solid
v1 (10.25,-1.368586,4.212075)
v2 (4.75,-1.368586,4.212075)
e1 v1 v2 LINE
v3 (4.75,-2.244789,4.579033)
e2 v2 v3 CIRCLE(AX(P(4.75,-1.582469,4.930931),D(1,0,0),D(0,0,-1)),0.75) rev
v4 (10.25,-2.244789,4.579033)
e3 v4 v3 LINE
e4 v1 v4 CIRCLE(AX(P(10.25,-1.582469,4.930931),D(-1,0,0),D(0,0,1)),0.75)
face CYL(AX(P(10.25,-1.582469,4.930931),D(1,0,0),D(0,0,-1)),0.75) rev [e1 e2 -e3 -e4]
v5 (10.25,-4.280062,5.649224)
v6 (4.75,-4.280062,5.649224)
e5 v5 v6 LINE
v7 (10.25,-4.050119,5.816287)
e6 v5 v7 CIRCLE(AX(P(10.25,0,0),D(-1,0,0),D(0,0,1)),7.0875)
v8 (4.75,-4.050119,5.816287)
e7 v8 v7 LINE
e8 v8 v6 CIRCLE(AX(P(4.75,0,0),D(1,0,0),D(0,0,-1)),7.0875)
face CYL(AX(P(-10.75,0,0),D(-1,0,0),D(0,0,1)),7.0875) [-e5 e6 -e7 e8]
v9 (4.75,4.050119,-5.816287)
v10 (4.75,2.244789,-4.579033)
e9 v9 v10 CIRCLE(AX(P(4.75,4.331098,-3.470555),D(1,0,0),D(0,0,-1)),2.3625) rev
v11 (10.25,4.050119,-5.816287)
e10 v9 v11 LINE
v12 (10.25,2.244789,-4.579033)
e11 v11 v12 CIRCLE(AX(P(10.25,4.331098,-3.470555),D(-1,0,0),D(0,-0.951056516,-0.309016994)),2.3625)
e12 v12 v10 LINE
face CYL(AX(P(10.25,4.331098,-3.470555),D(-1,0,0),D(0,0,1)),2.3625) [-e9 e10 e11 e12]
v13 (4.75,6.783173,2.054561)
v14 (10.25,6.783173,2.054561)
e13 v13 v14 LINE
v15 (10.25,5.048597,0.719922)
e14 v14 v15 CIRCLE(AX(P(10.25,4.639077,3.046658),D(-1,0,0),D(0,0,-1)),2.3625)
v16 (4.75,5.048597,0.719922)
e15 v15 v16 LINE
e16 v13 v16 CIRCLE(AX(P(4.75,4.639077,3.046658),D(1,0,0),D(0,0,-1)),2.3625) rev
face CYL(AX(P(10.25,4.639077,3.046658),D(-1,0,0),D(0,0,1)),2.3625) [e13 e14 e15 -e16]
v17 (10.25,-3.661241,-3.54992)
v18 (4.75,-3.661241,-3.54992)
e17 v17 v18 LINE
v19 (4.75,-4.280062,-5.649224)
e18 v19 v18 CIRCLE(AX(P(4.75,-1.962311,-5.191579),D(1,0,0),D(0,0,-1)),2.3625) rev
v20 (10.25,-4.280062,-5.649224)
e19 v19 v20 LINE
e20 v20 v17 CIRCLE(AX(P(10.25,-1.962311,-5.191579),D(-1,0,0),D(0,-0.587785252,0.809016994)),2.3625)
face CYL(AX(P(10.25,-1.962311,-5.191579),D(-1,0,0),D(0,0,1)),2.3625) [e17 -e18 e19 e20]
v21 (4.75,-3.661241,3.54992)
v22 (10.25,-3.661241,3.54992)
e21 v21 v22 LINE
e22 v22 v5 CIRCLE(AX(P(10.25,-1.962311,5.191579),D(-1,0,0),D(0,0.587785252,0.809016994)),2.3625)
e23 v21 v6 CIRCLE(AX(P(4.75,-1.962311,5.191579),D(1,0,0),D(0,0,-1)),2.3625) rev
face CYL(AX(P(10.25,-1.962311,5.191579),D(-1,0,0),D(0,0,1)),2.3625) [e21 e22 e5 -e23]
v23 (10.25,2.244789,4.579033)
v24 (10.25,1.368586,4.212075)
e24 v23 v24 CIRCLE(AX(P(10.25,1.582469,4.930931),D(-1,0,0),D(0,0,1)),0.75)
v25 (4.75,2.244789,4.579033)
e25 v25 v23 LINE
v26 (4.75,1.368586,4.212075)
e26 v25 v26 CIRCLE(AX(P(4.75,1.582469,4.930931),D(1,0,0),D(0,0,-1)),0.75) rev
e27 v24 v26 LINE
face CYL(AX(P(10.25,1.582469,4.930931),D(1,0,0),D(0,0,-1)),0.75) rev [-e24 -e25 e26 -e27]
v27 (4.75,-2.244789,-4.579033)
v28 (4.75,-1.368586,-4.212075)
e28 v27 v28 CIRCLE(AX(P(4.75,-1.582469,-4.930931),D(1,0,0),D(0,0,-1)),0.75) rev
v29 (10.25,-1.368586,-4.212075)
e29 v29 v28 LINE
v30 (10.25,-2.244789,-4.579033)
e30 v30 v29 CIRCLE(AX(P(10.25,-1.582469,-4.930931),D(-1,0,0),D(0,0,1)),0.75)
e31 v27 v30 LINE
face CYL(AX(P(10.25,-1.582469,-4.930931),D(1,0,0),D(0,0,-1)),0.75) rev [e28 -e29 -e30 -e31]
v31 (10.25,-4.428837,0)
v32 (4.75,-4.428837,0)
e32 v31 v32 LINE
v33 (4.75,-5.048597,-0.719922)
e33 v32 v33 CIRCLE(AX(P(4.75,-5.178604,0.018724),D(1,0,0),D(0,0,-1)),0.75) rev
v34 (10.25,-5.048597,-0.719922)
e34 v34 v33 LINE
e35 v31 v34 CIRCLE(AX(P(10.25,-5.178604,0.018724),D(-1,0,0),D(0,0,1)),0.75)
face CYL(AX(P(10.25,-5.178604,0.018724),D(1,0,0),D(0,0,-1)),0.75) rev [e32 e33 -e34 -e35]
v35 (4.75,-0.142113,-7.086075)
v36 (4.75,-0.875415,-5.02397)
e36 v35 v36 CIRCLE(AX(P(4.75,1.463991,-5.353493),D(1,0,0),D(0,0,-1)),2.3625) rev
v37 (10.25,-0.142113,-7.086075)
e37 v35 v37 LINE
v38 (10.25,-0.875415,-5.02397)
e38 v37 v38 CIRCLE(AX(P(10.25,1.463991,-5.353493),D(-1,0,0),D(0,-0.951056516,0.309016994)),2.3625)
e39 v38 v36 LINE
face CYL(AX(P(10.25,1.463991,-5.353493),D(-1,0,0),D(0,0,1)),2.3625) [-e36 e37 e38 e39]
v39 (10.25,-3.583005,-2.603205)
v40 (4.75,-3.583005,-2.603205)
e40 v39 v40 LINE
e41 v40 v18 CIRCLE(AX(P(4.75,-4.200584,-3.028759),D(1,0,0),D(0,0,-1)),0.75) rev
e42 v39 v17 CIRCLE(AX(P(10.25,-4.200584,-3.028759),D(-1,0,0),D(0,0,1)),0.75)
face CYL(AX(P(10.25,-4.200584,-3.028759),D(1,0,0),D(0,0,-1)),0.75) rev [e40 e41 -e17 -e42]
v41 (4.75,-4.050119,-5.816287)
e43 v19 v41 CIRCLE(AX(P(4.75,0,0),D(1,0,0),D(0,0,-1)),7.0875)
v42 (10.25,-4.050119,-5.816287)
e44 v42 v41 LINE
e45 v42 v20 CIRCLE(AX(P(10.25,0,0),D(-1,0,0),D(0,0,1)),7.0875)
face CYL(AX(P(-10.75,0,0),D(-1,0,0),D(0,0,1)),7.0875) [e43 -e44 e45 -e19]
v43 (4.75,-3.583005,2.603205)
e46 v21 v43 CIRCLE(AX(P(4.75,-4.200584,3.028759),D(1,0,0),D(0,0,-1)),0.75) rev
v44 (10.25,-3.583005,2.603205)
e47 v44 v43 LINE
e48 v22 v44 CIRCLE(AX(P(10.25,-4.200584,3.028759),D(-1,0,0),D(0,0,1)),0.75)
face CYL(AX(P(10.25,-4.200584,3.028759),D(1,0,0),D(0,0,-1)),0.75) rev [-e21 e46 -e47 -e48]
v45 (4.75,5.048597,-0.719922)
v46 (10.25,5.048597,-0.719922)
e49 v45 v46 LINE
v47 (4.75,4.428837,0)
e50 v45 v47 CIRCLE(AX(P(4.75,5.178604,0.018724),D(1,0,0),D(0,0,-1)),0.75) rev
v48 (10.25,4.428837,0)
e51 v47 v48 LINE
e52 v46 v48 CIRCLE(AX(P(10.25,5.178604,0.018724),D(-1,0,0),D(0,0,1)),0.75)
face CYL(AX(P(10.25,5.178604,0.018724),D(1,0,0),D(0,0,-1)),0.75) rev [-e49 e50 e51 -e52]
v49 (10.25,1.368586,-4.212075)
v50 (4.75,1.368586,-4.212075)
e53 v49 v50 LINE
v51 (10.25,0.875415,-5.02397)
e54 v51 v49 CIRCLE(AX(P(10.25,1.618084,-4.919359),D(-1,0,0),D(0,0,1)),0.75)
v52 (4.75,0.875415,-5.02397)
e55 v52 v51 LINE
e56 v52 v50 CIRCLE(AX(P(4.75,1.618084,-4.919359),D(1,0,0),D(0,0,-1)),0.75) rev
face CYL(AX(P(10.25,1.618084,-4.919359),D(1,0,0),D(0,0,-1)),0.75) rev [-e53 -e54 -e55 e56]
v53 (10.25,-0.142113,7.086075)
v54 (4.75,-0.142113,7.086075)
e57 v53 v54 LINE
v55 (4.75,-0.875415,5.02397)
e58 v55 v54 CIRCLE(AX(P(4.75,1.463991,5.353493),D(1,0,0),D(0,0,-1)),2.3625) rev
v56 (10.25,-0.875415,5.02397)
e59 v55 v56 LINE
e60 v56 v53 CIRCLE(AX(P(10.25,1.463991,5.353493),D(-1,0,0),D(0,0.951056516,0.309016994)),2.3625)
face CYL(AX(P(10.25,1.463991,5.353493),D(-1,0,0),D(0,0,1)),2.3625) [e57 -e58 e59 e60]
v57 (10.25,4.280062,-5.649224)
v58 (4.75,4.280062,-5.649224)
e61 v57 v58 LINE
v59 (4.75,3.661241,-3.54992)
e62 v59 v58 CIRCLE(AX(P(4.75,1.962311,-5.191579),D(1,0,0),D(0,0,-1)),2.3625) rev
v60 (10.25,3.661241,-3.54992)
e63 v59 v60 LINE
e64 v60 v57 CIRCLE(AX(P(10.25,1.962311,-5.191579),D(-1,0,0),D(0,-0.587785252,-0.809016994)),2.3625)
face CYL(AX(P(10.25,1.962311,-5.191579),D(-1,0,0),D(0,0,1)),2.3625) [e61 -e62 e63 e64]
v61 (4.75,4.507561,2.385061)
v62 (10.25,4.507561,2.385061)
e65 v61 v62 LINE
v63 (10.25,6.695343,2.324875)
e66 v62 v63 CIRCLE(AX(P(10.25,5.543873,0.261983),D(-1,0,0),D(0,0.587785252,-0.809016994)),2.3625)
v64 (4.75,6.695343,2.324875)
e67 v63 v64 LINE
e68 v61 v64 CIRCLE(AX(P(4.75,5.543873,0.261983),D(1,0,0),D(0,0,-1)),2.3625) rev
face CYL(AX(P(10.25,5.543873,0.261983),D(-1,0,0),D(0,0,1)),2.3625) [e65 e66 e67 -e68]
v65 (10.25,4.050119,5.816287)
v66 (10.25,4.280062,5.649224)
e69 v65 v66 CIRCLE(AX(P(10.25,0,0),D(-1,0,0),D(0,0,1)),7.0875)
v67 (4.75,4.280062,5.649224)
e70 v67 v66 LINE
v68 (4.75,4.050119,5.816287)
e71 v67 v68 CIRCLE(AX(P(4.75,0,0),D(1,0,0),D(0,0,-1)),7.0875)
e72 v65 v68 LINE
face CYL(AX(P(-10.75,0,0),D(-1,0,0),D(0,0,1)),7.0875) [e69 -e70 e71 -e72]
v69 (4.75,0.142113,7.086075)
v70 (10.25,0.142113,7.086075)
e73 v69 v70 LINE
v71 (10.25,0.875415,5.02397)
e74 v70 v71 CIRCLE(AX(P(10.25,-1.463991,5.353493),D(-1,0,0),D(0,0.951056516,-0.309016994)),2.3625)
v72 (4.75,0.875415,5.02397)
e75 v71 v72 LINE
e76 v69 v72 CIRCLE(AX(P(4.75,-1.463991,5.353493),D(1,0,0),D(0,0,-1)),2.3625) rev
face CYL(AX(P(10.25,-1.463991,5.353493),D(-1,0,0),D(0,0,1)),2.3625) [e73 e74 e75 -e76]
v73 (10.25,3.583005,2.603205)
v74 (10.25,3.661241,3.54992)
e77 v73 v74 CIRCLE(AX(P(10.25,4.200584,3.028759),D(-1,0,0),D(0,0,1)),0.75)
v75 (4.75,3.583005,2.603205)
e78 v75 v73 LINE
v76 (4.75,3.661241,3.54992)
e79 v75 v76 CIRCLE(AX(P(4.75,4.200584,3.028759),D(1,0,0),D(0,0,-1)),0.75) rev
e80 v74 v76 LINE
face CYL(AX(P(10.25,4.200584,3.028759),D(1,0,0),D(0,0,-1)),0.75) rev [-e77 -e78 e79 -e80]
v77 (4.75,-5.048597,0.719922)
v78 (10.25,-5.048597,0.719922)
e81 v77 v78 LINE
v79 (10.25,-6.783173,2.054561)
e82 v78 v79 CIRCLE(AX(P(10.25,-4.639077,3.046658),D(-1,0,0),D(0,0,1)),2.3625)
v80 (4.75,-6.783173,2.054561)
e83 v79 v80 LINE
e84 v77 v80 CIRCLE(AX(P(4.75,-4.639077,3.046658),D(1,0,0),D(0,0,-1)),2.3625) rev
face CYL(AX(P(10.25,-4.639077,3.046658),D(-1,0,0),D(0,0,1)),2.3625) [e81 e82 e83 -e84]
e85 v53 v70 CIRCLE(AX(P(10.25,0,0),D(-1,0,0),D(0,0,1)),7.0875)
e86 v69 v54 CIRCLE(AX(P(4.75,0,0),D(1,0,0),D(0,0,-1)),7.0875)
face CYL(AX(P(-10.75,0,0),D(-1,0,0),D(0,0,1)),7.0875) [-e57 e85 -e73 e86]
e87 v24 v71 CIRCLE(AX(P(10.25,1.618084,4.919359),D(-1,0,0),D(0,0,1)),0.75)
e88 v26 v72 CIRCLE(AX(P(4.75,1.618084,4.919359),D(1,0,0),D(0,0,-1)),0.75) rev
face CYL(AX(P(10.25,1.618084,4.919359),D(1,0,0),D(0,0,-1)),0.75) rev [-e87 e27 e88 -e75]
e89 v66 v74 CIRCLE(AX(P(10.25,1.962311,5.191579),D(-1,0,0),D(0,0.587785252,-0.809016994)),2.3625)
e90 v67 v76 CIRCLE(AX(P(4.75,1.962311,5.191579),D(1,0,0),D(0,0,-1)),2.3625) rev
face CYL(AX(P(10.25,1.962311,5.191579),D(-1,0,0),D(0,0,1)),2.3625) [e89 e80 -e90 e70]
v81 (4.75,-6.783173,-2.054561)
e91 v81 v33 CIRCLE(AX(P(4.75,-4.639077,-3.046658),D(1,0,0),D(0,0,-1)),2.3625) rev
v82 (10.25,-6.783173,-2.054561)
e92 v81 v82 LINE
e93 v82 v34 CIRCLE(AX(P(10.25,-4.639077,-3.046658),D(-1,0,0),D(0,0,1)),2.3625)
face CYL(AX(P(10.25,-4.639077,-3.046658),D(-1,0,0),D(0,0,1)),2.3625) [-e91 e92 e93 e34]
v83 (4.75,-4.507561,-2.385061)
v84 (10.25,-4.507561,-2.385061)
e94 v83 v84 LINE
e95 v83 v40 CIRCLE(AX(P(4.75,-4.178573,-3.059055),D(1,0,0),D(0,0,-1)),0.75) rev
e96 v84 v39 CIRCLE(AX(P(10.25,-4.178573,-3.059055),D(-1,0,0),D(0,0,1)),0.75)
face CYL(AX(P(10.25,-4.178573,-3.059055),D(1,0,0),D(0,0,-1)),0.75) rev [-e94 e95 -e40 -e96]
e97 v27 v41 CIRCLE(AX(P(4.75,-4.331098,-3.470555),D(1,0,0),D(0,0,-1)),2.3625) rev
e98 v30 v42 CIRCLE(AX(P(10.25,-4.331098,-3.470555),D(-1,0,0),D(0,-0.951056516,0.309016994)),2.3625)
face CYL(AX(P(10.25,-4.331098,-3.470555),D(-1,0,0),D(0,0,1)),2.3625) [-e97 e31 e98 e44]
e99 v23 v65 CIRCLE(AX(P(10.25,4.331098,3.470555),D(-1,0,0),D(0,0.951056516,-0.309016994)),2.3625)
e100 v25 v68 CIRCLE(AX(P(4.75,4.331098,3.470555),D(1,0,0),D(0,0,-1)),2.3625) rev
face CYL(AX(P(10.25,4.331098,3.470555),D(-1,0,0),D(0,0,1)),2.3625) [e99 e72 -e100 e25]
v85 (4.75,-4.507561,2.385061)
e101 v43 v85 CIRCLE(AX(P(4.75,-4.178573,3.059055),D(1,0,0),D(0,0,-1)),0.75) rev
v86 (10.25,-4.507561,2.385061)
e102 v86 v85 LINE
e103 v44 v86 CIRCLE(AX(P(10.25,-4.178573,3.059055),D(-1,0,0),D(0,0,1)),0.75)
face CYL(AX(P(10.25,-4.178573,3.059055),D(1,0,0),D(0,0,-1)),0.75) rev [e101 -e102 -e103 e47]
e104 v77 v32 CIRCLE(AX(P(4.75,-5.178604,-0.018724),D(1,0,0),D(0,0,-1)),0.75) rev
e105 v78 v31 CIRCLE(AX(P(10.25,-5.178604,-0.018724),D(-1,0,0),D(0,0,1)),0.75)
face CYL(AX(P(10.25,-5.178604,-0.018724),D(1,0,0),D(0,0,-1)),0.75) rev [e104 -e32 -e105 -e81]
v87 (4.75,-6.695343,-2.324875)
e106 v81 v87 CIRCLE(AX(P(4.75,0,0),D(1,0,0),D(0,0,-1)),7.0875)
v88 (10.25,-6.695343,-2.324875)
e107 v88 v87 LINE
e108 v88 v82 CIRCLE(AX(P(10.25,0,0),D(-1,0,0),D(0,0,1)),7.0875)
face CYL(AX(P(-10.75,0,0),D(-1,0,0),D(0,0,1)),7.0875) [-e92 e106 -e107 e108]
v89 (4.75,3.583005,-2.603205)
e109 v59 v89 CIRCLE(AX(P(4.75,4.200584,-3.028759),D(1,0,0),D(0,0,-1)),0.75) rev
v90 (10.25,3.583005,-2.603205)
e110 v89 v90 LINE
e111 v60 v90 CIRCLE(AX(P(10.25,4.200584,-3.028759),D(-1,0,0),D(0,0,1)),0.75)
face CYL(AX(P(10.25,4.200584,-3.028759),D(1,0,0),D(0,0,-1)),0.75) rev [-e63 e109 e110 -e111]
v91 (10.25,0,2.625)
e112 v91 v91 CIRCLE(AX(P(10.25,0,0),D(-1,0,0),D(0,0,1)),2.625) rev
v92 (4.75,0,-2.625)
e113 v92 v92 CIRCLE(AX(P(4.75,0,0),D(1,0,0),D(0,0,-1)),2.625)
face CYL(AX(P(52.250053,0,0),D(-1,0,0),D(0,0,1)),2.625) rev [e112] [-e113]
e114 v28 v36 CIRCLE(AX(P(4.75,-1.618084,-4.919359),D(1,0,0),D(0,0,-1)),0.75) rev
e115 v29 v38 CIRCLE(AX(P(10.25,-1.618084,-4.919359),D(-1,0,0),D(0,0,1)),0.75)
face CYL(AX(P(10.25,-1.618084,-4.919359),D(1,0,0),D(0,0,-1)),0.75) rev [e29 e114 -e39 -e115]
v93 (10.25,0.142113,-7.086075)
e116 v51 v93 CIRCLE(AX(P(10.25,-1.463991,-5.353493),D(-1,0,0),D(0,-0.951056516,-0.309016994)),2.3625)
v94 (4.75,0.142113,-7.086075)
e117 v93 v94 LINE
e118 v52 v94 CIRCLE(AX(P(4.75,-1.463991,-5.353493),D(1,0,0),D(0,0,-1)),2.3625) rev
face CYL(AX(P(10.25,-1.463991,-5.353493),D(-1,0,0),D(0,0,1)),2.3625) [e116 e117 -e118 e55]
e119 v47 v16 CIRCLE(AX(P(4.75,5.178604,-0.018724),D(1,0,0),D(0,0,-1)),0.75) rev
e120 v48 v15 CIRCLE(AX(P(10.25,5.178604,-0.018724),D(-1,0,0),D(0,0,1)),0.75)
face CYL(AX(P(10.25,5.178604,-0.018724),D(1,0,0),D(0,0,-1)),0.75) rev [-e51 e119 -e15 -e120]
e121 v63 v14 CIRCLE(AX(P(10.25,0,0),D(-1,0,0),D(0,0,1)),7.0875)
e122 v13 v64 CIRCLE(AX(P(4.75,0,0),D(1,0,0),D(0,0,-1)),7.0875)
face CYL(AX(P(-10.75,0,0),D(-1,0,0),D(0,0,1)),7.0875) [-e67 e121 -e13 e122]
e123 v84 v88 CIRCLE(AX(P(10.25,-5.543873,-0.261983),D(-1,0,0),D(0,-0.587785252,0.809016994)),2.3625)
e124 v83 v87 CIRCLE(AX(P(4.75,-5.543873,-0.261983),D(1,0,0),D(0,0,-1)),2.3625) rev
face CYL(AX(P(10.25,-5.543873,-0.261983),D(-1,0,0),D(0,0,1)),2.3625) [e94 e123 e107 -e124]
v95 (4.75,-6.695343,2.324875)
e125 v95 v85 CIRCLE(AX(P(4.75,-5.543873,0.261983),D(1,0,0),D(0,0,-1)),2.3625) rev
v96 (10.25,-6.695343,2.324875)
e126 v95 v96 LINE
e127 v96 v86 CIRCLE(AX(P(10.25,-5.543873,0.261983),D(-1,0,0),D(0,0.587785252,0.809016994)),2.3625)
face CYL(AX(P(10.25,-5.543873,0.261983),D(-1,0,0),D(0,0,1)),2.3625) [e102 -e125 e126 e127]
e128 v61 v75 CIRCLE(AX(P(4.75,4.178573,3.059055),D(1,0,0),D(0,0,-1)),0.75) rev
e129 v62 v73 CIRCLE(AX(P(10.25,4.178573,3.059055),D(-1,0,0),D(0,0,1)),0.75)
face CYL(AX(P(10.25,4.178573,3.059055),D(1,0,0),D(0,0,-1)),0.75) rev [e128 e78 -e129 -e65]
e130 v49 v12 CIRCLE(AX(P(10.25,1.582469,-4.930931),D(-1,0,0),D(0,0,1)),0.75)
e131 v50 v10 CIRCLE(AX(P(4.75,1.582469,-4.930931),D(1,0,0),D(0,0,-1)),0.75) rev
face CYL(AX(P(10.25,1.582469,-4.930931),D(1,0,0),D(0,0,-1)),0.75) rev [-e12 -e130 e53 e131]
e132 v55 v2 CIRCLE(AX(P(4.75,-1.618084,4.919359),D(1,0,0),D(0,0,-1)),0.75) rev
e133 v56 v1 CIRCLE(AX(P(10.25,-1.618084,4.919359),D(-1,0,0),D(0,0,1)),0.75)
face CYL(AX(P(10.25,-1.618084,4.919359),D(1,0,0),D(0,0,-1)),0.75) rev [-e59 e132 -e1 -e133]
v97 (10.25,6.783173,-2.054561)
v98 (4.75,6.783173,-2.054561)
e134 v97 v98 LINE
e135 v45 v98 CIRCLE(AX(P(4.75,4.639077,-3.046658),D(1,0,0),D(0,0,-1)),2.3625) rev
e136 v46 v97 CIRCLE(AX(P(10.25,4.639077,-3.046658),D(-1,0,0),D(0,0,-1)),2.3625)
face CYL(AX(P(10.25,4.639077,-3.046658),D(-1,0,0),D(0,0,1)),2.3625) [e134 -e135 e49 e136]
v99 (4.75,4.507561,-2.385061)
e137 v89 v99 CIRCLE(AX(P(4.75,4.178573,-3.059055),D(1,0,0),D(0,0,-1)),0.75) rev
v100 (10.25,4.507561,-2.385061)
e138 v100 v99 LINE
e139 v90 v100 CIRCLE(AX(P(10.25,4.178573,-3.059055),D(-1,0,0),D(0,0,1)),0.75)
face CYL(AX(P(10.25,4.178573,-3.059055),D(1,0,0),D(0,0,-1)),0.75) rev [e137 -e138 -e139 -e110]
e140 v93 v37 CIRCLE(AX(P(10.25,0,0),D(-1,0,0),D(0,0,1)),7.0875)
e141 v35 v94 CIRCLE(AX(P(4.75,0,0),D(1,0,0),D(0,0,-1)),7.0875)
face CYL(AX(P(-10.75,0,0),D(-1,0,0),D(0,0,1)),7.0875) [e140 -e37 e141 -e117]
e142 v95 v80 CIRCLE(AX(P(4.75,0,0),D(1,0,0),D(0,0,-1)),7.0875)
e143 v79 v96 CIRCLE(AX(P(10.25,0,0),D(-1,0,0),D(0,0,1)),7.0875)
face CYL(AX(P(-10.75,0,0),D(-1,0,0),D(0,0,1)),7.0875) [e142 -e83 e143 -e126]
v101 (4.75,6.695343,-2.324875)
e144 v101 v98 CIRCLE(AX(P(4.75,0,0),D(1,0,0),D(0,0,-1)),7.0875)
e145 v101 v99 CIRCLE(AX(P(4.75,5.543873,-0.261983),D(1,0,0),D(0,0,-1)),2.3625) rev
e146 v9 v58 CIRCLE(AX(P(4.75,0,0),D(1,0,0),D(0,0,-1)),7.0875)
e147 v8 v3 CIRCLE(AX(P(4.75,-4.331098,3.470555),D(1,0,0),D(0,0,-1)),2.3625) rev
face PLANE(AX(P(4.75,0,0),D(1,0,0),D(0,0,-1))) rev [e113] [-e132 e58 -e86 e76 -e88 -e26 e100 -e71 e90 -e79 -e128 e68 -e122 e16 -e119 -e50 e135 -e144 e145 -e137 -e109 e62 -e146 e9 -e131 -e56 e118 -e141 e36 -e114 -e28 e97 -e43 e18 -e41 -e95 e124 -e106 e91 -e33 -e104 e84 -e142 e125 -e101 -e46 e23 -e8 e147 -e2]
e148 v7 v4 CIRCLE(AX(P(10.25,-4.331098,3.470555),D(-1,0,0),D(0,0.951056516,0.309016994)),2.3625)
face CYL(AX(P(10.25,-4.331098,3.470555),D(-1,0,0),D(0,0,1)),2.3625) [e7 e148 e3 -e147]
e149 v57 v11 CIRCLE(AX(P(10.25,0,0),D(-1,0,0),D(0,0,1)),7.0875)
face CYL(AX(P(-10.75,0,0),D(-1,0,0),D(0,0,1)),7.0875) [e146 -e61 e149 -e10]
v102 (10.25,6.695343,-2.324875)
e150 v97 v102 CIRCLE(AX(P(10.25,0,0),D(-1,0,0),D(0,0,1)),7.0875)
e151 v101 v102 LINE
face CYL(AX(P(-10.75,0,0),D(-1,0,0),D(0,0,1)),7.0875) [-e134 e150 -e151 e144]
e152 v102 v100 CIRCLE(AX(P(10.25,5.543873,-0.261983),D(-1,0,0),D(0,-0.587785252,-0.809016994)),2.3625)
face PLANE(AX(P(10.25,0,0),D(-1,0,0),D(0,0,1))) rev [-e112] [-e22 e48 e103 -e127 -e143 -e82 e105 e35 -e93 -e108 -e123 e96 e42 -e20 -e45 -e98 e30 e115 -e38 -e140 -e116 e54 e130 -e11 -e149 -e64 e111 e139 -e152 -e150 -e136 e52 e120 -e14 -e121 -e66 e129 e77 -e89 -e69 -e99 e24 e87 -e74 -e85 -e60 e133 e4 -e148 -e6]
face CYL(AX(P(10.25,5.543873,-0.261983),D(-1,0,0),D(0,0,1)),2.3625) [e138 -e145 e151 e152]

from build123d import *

# Parameters (mm, degrees)
BASPROSKE_W        = 10
BASPROSKE_H        = 6.75
TOOTHCUT_DEPTH     = 14.824796563
TEETHCUTS_COUNT    = 10
TEETHCUTS_ANGLE    = 324
BORSKE_R           = 2.5
BORE_DEPTH         = 50.0000508
SCALE1_SCALE       = 1.05
FILLET1_R          = 0.75
CUT_EXTRUDE1_START = -10.5
SKETCH1_R          = 10.265831804
CUT_EXTRUDE1_DEPTH = 5


with BuildPart() as part:
    # BasProSke → Base-Revolve (revolve)
    with BuildSketch(Plane(origin=(0, 0, 0), x_dir=(1, 0, 0), z_dir=(0, 1, 0)), mode=Mode.PRIVATE) as base_revolve_sk:
        with Locations((5, 3.375)):
            Rectangle(BASPROSKE_W, BASPROSKE_H)
    revolve(base_revolve_sk.sketch.rotate(Axis((-10, 0, 0), (1, 0, 0)), 180), axis=Axis((-10, 0, 0), (1, 0, 0)))

    # TooCutSke → ToothCut (cut, through all)
    with BuildSketch(Plane(origin=(0, 0, 0), x_dir=(0, 0, -1), z_dir=(1, 0, 0))):
        with BuildLine():
            ThreePointArc((0.665884296, 4.164854519), (0, 4.21775), (-0.665884296, 4.164854519))
            ThreePointArc((-0.665884296, 4.164854519), (-0.949936307, 5.537806691), (-1.991778305, 6.476022262))
            ThreePointArc((-1.991778305, 6.476022262), (0, 6.7754), (1.991778305, 6.476022262))
            ThreePointArc((1.991778305, 6.476022262), (0.949936307, 5.537806691), (0.665884296, 4.164854519))
        make_face()
    toothcut = extrude(amount=TOOTHCUT_DEPTH, mode=Mode.SUBTRACT)

    # TeethCuts: ToothCut ×10 about axis
    teethcuts_axis = Axis((-10, 0, 0), (1, 0, 0))
    for i in range(1, TEETHCUTS_COUNT):
        add(toothcut.rotate(teethcuts_axis, i * TEETHCUTS_ANGLE / (TEETHCUTS_COUNT - 1)), mode=Mode.SUBTRACT)

    # BorSke → Bore (cut, symmetric)
    with BuildSketch(Plane(origin=(0, 0, 0), x_dir=(0, 0, -1), z_dir=(1, 0, 0))):
        with Locations(Location((0, 0, 0), (0, 0, 180))):
            Circle(BORSKE_R)
    extrude(amount=BORE_DEPTH, both=True, mode=Mode.SUBTRACT)


with BuildPart() as part_1:
    # Scale1: scaled about (5, 0, 0)
    add(part.part.scale(SCALE1_SCALE).moved(Location((-0.25, 0, 0))))

    # Fillet1
    # the kernel refuses this fillet: 0.75 mm, written as the material it adds along each edge
    with BuildSketch(Plane(origin=(-0.25, 3.126943172, -3.136089365), x_dir=(0, 0.6486282387058202, 0.7611053855763902), z_dir=(1, 0, 0)), Plane(origin=(-0.25, 0.686403088, -4.375120673), x_dir=(0, 0.9721177892266772, 0.23449307850987308), z_dir=(1, 0, 0)), Plane(origin=(-0.25, -2.016319645, -3.94300459), x_dir=(0, 0.9242913853313495, -0.38168761442081794), z_dir=(1, 0, 0)), Plane(origin=(-0.25, -3.948876807, -2.004794771), x_dir=(0, 0.5234170877481713, -0.8520766117276212), z_dir=(1, 0, 0)), Plane(origin=(-0.25, -4.373097245, 0.69917851), x_dir=(0, -0.07738474706232469, -0.9970013043733192), z_dir=(1, 0, 0))) as fillet1_piece_1:
        with BuildLine():
            CenterArc((0.778083465, -0.747536247), FILLET1_R, 94.645414963, 79.810658705)
            ThreePointArc((0.031591647, -0.675079607), (0.040059779, -0.336404325), (0, 0))
            ThreePointArc((0, 0), (0.358670863, -0.01454809), (0.717341725, 0))
        make_face()
    extrude(amount=10.5)
    with BuildSketch(Plane(origin=(-0.25, 3.948876807, -2.004794771), x_dir=(0, 0.8266776070022068, -0.562675869467587), z_dir=(1, 0, 0)), Plane(origin=(-0.25, 2.016319645, -3.94300459), x_dir=(0, 0.3380636550401047, -0.9411232465203083), z_dir=(1, 0, 0)), Plane(origin=(-0.25, -0.686403088, -4.375120673), x_dir=(0, -0.27967912278629736, -0.9600935310049158), z_dir=(1, 0, 0)), Plane(origin=(-0.25, -3.126943172, -3.136089365), x_dir=(0, -0.7905939816520889, -0.6123407190245448), z_dir=(1, 0, 0)), Plane(origin=(-0.25, -4.373097245, -0.69917851), x_dir=(0, -0.9995288108278918, -0.030694565072345244), z_dir=(1, 0, 0))) as fillet1_piece_2:
        with BuildLine():
            CenterArc((0.78309116, -0.742288727), FILLET1_R, 98.223237645, 79.810658705)
            ThreePointArc((0.033532686, -0.716557541), (0.031298529, -0.357598709), (0, 0))
            ThreePointArc((0, 0), (0.337909199, -0.024290509), (0.675818399, 0))
        make_face()
    extrude(amount=10.5)
    with BuildSketch(Plane(origin=(-0.25, -3.948876807, 2.004794771), x_dir=(0, 0.5234170877481569, 0.8520766117276299), z_dir=(1, 0, 0)), Plane(origin=(-0.25, -2.016319645, 3.94300459), x_dir=(0, 0.9242913853313433, 0.38168761442083243), z_dir=(1, 0, 0)), Plane(origin=(-0.25, 0.686403088, 4.375120673), x_dir=(0, 0.9721177892266811, -0.23449307850985693), z_dir=(1, 0, 0)), Plane(origin=(-0.25, 3.126943172, 3.136089365), x_dir=(0, 0.6486282387058309, -0.761105385576381), z_dir=(1, 0, 0)), Plane(origin=(-0.25, 4.373097245, 0.69917851), x_dir=(0, 0.07738474706233216, -0.9970013043733188), z_dir=(1, 0, 0))) as fillet1_piece_3:
        with BuildLine():
            CenterArc((0.778083465, 0.747536247), FILLET1_R, 185.543926332, 79.810658705)
            ThreePointArc((0.031591647, 0.675079607), (0.040059779, 0.336404325), (0, 0))
            ThreePointArc((0, 0), (0.358670863, 0.01454809), (0.717341725, 0))
        make_face()
    extrude(amount=10.5)
    with BuildSketch(Plane(origin=(-0.25, -3.126943172, 3.136089365), x_dir=(0, -0.7905939816520986, 0.6123407190245325), z_dir=(1, 0, 0)), Plane(origin=(-0.25, -0.686403088, 4.375120673), x_dir=(0, -0.2796791227863126, 0.9600935310049113), z_dir=(1, 0, 0)), Plane(origin=(-0.25, 2.016319645, 3.94300459), x_dir=(0, 0.33806365504009167, 0.9411232465203131), z_dir=(1, 0, 0)), Plane(origin=(-0.25, 3.948876807, 2.004794771), x_dir=(0, 0.826677607002198, 0.5626758694676001), z_dir=(1, 0, 0)), Plane(origin=(-0.25, 4.373097245, -0.69917851), x_dir=(0, 0.9995288108278919, -0.030694565072338184), z_dir=(1, 0, 0))) as fillet1_piece_4:
        with BuildLine():
            CenterArc((0.78309116, 0.742288727), FILLET1_R, 181.96610365, 79.810658705)
            ThreePointArc((0.033532686, 0.716557541), (0.031298529, 0.357598709), (0, 0))
            ThreePointArc((0, 0), (0.337909199, 0.024290509), (0.675818399, 0))
        make_face()
    extrude(amount=10.5)

    # Sketch1 → Cut-Extrude1 (cut)
    with BuildSketch(Plane(origin=(10.25, 0, 0), x_dir=(0, 0, -1), z_dir=(1, 0, 0)).offset(CUT_EXTRUDE1_START)):
        Circle(SKETCH1_R)
    extrude(amount=CUT_EXTRUDE1_DEPTH, mode=Mode.SUBTRACT)


solid = part_1.part
